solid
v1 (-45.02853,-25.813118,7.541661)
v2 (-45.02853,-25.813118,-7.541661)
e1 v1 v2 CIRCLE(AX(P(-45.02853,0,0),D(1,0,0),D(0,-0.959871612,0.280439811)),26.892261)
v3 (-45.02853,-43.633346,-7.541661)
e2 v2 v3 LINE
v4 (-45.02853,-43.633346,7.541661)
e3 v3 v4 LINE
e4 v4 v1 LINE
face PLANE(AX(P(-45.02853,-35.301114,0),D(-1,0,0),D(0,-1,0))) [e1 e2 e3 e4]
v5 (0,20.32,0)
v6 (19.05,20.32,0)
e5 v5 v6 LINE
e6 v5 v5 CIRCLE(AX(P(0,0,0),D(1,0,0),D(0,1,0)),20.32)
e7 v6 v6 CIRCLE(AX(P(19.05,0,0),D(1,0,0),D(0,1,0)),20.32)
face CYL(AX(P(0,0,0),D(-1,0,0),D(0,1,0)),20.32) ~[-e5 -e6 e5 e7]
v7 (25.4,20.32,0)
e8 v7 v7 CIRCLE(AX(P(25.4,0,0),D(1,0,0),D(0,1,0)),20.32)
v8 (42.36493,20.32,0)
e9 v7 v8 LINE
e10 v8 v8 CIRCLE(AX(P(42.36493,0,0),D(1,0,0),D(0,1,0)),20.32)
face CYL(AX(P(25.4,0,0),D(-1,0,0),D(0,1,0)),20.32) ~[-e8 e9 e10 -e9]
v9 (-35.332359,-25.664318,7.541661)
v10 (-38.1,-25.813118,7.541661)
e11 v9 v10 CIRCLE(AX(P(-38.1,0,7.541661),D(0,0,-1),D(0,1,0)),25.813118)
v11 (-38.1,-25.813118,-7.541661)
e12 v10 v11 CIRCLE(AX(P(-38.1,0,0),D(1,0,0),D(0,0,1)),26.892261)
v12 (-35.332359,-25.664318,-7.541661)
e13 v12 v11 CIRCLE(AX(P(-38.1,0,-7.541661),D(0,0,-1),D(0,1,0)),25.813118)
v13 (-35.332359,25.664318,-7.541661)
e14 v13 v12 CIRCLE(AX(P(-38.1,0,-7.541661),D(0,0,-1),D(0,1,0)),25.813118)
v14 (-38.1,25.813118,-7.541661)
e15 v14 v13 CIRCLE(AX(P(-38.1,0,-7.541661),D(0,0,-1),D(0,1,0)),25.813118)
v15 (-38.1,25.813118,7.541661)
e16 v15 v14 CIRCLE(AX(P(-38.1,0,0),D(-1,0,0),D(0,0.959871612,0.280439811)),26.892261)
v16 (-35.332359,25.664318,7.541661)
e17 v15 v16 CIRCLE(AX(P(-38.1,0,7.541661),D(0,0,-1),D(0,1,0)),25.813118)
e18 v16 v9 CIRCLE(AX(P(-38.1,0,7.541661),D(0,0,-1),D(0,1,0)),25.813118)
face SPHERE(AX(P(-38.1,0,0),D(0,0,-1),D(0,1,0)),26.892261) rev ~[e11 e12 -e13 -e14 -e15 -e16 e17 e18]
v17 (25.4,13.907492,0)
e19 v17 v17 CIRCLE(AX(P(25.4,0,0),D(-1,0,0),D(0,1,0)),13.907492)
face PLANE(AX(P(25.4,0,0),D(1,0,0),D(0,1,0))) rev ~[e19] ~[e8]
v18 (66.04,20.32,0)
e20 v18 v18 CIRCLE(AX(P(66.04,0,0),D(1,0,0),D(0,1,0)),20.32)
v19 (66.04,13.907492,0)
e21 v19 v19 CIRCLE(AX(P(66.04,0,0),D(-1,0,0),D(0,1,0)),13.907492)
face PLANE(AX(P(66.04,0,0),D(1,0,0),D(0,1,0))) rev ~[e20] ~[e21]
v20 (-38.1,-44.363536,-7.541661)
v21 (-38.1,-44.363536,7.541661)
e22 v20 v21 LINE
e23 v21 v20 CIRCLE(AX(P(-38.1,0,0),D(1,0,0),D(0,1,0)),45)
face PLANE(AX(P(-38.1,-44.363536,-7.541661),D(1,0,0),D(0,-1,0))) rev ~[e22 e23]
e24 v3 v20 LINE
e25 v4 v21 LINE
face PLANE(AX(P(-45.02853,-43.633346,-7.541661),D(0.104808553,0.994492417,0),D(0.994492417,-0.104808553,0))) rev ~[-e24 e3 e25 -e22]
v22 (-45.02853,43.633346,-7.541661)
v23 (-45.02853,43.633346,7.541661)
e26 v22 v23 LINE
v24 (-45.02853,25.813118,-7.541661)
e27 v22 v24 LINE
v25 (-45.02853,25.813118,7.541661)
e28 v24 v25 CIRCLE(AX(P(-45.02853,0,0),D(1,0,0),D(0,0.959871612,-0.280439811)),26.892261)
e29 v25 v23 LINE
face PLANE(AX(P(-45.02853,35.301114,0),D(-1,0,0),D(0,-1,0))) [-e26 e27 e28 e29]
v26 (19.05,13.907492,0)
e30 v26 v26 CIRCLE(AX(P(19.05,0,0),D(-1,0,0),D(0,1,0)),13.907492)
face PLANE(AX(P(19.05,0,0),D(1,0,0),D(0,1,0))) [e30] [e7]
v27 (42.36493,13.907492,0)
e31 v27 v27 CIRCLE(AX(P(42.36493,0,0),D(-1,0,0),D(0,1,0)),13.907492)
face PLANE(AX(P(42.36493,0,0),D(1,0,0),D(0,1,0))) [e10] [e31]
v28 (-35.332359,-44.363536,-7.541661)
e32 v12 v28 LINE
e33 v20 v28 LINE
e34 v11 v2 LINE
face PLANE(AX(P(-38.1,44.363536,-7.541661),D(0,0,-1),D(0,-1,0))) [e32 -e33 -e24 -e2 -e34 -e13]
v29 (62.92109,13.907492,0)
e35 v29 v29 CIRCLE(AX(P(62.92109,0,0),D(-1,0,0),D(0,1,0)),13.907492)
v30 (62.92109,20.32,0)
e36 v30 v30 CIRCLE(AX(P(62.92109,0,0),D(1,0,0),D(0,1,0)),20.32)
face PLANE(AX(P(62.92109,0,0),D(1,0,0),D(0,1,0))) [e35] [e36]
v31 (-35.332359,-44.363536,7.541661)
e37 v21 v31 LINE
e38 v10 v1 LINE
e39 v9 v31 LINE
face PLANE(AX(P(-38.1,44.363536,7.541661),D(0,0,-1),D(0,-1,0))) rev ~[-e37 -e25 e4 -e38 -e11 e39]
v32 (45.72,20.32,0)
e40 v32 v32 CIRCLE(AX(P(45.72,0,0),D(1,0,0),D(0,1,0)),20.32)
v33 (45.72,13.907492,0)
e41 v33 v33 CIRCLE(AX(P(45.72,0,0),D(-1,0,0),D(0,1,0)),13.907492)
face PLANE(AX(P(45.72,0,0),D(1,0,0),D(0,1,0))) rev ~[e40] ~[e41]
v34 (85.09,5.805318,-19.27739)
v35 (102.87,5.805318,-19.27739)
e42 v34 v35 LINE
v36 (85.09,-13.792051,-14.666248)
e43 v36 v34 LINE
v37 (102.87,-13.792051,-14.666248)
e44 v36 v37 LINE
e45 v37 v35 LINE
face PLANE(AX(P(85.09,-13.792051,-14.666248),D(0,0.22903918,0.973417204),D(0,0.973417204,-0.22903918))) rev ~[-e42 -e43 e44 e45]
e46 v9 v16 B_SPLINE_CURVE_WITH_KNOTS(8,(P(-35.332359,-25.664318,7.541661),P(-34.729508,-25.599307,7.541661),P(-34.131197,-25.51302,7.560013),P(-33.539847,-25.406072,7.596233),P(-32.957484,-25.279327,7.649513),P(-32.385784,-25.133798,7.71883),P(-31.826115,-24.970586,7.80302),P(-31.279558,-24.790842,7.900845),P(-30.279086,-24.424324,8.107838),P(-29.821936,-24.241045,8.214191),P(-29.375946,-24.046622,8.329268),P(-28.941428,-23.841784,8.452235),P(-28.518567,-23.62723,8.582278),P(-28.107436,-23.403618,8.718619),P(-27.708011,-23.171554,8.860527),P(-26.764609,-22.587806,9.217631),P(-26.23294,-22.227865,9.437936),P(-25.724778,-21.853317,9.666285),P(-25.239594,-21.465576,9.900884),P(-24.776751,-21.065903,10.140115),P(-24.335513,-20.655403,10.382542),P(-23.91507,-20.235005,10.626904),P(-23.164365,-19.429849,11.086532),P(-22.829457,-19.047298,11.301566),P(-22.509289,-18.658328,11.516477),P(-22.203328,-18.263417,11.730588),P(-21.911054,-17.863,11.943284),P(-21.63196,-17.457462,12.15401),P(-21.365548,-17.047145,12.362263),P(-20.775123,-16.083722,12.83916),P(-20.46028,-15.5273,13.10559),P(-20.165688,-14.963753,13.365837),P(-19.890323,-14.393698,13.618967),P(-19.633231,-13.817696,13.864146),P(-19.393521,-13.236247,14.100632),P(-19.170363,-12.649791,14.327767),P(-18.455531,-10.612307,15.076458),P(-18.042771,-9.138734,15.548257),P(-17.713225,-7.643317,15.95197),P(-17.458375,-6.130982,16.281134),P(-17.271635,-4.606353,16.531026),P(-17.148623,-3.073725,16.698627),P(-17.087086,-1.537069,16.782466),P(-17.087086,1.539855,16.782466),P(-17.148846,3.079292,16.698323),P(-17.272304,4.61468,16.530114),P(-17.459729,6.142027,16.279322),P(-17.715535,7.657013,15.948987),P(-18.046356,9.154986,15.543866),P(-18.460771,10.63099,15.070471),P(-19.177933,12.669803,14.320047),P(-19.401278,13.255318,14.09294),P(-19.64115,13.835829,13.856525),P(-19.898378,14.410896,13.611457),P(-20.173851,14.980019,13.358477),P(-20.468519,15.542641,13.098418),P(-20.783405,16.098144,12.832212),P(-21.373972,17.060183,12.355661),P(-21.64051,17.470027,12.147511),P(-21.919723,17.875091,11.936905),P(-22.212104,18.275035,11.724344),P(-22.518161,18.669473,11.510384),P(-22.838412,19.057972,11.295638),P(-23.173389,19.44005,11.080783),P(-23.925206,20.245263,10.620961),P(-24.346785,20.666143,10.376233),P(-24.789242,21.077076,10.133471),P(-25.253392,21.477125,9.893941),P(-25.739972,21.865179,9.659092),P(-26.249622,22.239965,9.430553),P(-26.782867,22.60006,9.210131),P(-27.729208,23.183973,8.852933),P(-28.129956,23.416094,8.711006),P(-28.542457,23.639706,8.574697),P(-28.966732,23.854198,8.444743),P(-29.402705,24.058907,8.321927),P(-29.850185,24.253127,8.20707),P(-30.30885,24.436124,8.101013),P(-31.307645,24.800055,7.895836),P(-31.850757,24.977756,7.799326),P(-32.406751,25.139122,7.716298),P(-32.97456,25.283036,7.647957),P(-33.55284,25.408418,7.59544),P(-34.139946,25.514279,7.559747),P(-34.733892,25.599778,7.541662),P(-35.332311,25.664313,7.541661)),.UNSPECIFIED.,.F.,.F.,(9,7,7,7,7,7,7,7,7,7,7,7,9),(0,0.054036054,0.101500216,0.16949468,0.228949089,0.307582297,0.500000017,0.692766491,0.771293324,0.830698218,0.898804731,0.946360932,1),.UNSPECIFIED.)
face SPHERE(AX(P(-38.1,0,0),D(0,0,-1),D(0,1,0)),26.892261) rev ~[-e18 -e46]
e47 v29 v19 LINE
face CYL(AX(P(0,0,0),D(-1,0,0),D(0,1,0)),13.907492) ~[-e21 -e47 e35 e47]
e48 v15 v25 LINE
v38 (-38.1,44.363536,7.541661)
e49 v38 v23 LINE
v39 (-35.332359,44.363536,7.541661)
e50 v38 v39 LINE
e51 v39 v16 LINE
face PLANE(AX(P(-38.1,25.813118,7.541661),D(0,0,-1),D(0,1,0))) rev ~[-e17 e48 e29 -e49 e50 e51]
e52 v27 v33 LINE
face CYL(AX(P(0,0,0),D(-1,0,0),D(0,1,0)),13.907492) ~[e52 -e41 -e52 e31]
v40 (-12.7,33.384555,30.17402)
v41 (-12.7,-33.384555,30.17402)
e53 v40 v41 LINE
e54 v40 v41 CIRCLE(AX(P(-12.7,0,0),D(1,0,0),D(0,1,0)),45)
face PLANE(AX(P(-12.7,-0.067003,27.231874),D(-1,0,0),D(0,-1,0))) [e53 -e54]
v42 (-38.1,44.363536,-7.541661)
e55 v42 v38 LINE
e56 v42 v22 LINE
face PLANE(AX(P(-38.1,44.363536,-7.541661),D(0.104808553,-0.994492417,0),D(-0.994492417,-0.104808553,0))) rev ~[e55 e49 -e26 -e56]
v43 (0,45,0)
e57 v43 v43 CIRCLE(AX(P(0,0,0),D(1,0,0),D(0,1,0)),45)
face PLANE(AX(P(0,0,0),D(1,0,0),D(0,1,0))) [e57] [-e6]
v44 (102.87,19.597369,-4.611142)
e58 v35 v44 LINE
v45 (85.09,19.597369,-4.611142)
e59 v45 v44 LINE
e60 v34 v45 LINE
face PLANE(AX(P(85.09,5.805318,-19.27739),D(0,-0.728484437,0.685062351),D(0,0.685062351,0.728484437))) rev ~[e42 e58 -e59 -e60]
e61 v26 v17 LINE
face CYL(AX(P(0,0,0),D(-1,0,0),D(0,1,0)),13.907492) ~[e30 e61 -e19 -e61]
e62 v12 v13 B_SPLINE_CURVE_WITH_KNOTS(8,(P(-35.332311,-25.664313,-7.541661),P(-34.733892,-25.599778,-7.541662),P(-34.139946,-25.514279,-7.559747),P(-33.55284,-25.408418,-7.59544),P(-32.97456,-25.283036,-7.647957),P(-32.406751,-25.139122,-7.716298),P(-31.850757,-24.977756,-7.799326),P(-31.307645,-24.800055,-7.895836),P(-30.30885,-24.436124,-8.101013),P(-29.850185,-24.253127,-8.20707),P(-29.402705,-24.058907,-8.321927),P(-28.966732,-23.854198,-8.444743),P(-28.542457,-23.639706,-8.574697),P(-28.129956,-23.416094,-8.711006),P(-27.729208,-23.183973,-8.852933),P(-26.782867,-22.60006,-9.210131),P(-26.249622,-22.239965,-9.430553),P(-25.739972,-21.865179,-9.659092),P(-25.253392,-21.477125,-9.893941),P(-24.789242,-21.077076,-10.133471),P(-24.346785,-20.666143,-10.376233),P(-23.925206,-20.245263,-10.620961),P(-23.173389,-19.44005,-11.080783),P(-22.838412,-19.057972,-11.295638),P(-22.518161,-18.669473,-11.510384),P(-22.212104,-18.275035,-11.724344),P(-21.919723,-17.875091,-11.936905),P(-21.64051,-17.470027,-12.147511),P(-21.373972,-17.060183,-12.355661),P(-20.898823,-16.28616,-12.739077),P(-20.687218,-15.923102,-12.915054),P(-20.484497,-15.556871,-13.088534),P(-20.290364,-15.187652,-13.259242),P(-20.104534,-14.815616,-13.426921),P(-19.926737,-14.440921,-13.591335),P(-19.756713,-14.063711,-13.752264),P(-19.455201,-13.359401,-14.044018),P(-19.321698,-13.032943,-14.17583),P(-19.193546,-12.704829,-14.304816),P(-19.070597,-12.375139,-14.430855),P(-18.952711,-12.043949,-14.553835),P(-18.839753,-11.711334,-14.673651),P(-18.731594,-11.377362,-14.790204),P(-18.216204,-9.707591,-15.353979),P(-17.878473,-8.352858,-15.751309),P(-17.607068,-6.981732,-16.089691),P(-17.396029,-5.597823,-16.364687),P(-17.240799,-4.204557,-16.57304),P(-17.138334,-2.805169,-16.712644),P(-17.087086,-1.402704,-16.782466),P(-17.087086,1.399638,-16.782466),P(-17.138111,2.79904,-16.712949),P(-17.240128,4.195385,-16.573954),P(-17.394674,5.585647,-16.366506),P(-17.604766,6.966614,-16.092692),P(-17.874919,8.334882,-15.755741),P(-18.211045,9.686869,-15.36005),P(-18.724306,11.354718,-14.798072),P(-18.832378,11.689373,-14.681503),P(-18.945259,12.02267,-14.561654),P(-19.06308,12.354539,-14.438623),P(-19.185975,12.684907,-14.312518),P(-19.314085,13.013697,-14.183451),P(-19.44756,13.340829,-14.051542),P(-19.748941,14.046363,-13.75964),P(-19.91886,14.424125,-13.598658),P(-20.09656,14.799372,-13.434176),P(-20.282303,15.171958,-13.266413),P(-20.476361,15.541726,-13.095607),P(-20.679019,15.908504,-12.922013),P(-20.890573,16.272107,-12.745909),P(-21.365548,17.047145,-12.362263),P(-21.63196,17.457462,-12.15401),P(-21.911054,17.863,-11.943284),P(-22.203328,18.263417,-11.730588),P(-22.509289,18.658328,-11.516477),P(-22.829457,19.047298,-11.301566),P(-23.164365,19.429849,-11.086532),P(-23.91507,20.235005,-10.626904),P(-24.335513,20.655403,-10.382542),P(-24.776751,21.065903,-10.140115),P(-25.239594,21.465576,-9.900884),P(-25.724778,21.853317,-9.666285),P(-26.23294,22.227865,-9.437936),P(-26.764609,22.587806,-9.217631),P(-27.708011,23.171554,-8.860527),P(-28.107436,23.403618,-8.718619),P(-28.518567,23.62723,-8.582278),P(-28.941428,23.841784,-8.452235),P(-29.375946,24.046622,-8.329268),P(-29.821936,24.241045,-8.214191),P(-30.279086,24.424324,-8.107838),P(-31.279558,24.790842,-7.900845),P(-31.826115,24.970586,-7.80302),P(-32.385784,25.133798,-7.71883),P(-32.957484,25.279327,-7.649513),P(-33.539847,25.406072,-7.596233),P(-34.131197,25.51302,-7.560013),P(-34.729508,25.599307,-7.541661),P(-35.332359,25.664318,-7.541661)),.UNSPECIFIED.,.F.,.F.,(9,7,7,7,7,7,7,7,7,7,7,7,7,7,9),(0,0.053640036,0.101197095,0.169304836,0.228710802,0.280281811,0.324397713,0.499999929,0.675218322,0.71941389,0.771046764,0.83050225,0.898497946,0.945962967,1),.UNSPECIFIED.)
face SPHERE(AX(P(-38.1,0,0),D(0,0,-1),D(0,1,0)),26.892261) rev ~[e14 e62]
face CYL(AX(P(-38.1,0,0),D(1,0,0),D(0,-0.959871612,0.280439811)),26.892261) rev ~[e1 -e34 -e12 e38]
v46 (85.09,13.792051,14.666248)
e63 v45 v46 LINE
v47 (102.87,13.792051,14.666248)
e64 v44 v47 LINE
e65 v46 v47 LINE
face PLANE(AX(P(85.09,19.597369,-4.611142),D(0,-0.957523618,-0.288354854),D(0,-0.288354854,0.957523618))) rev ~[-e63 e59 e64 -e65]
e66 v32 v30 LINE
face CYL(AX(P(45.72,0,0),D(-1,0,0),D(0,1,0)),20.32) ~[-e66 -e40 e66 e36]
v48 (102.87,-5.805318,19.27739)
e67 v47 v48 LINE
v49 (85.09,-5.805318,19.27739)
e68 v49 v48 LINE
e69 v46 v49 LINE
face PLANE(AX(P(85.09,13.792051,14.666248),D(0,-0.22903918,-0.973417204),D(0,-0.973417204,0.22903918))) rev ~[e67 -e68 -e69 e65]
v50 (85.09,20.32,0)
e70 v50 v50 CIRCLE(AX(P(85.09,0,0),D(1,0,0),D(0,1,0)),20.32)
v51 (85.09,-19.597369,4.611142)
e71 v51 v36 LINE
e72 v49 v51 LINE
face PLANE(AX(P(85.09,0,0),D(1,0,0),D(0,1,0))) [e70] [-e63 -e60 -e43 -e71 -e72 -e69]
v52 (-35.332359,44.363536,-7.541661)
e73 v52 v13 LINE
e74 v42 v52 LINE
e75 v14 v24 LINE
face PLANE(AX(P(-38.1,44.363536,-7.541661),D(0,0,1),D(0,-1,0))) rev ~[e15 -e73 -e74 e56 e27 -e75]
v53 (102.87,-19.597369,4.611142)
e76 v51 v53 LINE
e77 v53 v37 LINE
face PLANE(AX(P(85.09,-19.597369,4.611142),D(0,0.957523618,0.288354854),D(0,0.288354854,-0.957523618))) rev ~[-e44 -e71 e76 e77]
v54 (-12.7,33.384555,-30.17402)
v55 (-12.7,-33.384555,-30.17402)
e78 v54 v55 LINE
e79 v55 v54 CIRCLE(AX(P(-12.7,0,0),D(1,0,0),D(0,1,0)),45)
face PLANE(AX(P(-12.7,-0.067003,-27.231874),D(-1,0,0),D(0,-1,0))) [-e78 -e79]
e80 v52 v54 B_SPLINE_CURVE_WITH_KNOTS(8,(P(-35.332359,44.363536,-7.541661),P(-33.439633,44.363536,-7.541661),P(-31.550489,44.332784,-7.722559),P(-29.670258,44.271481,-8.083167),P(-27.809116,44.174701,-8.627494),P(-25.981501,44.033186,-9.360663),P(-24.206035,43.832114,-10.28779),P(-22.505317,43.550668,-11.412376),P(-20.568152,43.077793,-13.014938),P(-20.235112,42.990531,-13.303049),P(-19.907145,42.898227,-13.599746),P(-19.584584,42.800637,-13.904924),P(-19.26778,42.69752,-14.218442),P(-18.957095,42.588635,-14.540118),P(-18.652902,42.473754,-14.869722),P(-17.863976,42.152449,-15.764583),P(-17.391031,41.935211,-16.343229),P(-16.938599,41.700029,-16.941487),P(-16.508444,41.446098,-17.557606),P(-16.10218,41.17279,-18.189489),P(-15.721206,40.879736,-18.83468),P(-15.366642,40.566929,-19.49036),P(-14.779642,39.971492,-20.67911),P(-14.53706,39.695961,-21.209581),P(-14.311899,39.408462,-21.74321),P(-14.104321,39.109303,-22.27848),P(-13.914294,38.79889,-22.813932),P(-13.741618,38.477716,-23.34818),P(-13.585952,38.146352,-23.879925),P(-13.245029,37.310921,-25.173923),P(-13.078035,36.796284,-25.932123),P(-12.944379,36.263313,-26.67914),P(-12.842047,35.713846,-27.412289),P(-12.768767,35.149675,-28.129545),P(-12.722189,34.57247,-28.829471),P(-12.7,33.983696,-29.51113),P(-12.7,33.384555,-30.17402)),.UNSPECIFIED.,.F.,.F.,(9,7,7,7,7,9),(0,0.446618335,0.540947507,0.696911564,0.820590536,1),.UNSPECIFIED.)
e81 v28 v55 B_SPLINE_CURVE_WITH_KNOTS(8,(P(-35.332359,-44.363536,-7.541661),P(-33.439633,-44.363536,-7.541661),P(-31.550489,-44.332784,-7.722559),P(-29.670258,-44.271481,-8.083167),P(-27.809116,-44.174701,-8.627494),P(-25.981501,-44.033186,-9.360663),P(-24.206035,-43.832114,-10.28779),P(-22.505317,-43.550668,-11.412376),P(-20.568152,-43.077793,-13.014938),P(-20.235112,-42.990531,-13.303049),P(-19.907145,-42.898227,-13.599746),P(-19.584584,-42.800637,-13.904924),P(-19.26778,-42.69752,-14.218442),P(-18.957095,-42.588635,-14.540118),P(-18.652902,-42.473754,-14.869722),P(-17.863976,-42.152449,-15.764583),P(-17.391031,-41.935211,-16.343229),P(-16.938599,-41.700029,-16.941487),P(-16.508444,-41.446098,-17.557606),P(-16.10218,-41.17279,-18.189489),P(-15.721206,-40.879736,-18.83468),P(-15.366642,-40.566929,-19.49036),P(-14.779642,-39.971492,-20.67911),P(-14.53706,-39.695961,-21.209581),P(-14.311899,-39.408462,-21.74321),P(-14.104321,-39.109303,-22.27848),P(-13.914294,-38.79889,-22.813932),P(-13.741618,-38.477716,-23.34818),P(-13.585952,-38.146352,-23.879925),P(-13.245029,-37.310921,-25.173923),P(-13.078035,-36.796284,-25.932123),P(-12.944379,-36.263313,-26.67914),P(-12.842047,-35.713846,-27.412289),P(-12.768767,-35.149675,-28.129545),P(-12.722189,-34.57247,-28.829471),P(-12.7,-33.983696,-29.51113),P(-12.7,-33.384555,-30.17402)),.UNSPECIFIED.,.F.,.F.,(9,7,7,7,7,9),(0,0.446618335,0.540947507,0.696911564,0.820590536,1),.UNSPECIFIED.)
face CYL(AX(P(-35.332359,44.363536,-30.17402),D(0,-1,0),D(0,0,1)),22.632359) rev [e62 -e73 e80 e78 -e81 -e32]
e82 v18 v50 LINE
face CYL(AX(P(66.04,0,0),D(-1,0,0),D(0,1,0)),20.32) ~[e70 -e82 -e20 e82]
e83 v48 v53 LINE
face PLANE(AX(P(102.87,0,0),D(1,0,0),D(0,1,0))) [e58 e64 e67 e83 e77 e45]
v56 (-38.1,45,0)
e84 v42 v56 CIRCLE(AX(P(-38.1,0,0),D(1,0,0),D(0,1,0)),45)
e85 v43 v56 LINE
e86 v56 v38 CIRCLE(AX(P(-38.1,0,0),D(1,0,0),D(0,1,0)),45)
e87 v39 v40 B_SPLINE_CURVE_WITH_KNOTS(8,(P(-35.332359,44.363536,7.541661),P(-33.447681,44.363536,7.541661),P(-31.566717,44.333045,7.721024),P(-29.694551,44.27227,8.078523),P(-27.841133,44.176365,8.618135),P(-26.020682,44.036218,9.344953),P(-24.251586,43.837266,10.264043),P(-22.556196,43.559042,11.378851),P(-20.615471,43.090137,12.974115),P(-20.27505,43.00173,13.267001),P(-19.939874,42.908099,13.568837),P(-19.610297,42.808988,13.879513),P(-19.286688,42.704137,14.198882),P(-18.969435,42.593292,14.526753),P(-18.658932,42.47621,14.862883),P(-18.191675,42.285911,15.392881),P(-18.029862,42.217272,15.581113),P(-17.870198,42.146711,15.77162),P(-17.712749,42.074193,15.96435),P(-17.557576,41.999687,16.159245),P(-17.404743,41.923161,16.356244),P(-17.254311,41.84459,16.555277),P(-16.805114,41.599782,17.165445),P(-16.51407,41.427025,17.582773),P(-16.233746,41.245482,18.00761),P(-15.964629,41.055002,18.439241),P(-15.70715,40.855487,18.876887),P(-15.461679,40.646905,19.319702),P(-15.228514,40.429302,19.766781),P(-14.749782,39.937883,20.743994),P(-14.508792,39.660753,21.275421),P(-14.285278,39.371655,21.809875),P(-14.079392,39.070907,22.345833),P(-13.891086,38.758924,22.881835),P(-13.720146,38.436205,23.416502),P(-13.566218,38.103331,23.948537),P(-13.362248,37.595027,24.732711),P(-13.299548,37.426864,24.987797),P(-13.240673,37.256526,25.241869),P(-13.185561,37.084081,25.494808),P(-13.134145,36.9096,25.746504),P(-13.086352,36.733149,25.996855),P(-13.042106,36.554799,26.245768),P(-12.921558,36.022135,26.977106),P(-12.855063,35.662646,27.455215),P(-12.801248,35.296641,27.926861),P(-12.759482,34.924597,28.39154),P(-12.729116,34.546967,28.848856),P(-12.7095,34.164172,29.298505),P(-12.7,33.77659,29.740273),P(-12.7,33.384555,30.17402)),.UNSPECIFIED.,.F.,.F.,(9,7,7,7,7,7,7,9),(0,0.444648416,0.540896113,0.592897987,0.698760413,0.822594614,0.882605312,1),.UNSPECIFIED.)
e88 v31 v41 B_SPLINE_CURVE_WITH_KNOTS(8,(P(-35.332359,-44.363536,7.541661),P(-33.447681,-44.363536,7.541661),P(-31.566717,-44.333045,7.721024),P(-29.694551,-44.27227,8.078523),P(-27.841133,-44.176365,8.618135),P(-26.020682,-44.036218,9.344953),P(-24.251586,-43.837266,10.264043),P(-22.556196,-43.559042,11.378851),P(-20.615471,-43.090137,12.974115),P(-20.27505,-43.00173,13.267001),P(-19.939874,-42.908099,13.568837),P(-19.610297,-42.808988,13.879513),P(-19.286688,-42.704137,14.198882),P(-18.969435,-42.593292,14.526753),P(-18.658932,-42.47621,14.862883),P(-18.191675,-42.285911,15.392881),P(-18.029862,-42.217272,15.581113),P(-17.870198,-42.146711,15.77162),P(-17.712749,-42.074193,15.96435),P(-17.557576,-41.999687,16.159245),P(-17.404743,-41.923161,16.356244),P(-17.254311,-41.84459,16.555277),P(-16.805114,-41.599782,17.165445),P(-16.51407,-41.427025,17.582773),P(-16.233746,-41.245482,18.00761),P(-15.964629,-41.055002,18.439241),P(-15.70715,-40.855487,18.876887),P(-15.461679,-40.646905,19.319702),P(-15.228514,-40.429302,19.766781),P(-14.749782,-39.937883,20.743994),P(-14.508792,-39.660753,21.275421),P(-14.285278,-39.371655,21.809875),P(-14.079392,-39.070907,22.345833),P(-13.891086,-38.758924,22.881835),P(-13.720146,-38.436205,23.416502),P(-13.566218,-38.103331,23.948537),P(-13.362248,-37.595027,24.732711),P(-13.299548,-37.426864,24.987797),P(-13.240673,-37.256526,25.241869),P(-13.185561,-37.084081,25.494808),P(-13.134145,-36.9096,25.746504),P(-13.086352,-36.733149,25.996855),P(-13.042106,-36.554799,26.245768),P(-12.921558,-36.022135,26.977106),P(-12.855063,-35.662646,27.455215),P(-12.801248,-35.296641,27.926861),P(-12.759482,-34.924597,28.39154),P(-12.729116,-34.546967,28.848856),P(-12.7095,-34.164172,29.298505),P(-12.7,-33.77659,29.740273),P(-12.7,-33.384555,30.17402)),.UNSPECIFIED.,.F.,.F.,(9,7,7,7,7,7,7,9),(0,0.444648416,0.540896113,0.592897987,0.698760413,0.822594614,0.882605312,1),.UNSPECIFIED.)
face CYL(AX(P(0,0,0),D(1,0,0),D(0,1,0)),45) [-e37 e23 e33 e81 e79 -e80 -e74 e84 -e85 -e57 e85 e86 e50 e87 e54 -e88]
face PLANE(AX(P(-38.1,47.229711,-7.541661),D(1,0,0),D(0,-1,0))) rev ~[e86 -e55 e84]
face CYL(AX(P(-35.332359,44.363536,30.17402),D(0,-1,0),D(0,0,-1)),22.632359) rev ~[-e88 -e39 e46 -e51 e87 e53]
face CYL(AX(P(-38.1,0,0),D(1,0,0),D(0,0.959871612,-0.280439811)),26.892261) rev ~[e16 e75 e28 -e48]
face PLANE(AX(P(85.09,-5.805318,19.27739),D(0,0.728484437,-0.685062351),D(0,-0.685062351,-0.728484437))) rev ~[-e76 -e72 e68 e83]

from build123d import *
from build123d import SkipClean  # not in build123d's __all__

# Parameters (mm, degrees)
F0_R      = 45
F1_DEPTH  = 38.1
F2_R      = 13.9074924411
F3_DEPTH  = 92.41422
F7_R      = 20.32
F8_DEPTH  = 19.05
F9_R      = 20.32
F10_DEPTH = 16.96493
F11_R     = 20.32
F12_DEPTH = 17.20109
F13_R     = 20.32
F14_DEPTH = 19.05
F16_DEPTH = 17.78
F17_W     = 88.86107839
F17_H     = 39.3804269531
F18_DEPTH = 25.4
F19_R     = 22.6323588882
F23_DEPTH = 6.92853
F24_W     = 6.92853
F24_H     = 2.8661746596
F25_DEPTH = 25.4


with BuildPart() as f1:
    # F0 (on Right) → F1 (new body)
    with BuildSketch(Plane.YZ):
        Circle(F0_R)
    extrude(amount=-F1_DEPTH)

    # F2 (on face) → F3 (join)
    with BuildSketch(Plane.YZ):
        Circle(F2_R)
    extrude(amount=F3_DEPTH)

    # F7 (on Right) → F8 (join)
    with BuildSketch(Plane.YZ):
        Circle(F7_R)
    extrude(amount=F8_DEPTH)

    # F9 (on offset) → F10 (join)
    with BuildSketch(Plane.YZ.offset(25.4)):
        Circle(F9_R)
    extrude(amount=F10_DEPTH)

    # F11 (on offset) → F12 (join)
    with BuildSketch(Plane.YZ.offset(45.72)):
        Circle(F11_R)
    extrude(amount=F12_DEPTH)

    # F13 (on offset) → F14 (join)
    with BuildSketch(Plane.YZ.offset(66.04)):
        Circle(F13_R)
    extrude(amount=F14_DEPTH)

    # F15 (on face) → F16 (join)
    with BuildSketch(Plane.YZ.offset(85.09)):
        Polygon((13.7920507069, 14.6662479487), (-5.8053179483, 19.2773902568), (-19.5973686552, 4.6111423081), (-13.7920507069, -14.6662479487), (5.8053179483, -19.2773902568), (19.5973686552, -4.6111423081), align=None)
    extrude(amount=F16_DEPTH)

    # F17 (on face) → F18 (cut)
    with BuildSketch(Plane(origin=(-38.1, 0, 0), x_dir=(0, -1, 0), z_dir=(-1, 0, 0))):
        with Locations((0.0670028883, 27.2318741928)):
            Rectangle(F17_W, F17_H)
        with Locations((0.0670028883, -27.2318741928)):
            Rectangle(F17_W, F17_H)
    extrude(amount=-F18_DEPTH, mode=Mode.SUBTRACT)

    # F19
    f19_edges = [f1.edges().sort_by_distance(p)[0] for p in [
        (-12.7, 0, 7.541661),
        (-12.7, 0, -7.541661),
    ]]
    fillet(f19_edges, radius=F19_R)

    # F20 (on face) → F21 (revolve, cut)
    with BuildSketch(Plane(origin=(-38.1, 0, 0), x_dir=(0, -1, 0), z_dir=(-1, 0, 0))):
        with BuildLine():
            Line((0, -7.5416607163), (0, 0))
            Line((0, 0), (0, 7.5416607163))
            Line((0, 7.5416607163), (-25.8131183102, 7.5416607163))
            ThreePointArc((-25.8131183102, 7.5416607163), (-26.8922614009, 0), (-25.8131183102, -7.5416607163))
            Line((-25.8131183102, -7.5416607163), (0, -7.5416607163))
        make_face()
        with BuildLine():
            Line((-25.8131183102, 7.5416607163), (0, 7.5416607163))
            Line((0, 7.5416607163), (0, 26.8922614009))
            ThreePointArc((0, 26.8922614009), (-16.1304279527, 21.5175049045), (-25.8131183102, 7.5416607163))
        make_face()
        with BuildLine():
            Line((0, -26.8922614009), (0, -7.5416607163))
            Line((0, -7.5416607163), (-25.8131183102, -7.5416607163))
            ThreePointArc((-25.8131183102, -7.5416607163), (-16.1304279527, -21.5175049045), (0, -26.8922614009))
        make_face()
    revolve(axis=Axis((-38.1, 0, 10.4196144343), (0, 0, -1)), mode=Mode.SUBTRACT)

    # F22 (on face) → F23 (join)
    with BuildSketch(Plane(origin=(-38.1, 0, 0), x_dir=(0, -1, 0), z_dir=(-1, 0, 0))):
        with BuildLine():
            Line((-25.8131183102, 7.5416607163), (-44.3635363068, 7.5416607163))
            ThreePointArc((-44.3635363068, 7.5416607163), (-45, 0), (-44.3635363068, -7.5416607163))
            Line((-44.3635363068, -7.5416607163), (-25.8131183102, -7.5416607163))
            ThreePointArc((-25.8131183102, -7.5416607163), (-26.8922614009, 0), (-25.8131183102, 7.5416607163))
        make_face()
        with BuildLine():
            ThreePointArc((25.8131183102, 7.5416607163), (26.8922614009, 0), (25.8131183102, -7.5416607163))
            Line((25.8131183102, -7.5416607163), (44.3635363068, -7.5416607163))
            ThreePointArc((44.3635363068, -7.5416607163), (45, 0), (44.3635363068, 7.5416607163))
            Line((44.3635363068, 7.5416607163), (25.8131183102, 7.5416607163))
        make_face()
    with SkipClean():  # cleaning this boolean's faces spoils the solid; the shape is the same uncleaned
        extrude(amount=F23_DEPTH)

    # F24 (on face) → F25 (cut)
    with BuildSketch(Plane(origin=(0, 0, -7.5416607163), x_dir=(1, 0, 0), z_dir=(0, 0, -1))):
        Polygon((-45.02853, 43.6333455145), (-38.1, 44.3635363068), (-38.1, 47.2297109663), (-45.02853, 47.2297109663), (-45.02853, 44.3635363068), align=None)
        Polygon((-45.02853, -44.3635363068), (-38.1, -44.3635363068), (-45.02853, -43.6333455145), align=None)
        with Locations((-41.564265, -45.7966236366)):
            Rectangle(F24_W, F24_H)
    extrude(amount=-F25_DEPTH, mode=Mode.SUBTRACT)


solid = f1.part
